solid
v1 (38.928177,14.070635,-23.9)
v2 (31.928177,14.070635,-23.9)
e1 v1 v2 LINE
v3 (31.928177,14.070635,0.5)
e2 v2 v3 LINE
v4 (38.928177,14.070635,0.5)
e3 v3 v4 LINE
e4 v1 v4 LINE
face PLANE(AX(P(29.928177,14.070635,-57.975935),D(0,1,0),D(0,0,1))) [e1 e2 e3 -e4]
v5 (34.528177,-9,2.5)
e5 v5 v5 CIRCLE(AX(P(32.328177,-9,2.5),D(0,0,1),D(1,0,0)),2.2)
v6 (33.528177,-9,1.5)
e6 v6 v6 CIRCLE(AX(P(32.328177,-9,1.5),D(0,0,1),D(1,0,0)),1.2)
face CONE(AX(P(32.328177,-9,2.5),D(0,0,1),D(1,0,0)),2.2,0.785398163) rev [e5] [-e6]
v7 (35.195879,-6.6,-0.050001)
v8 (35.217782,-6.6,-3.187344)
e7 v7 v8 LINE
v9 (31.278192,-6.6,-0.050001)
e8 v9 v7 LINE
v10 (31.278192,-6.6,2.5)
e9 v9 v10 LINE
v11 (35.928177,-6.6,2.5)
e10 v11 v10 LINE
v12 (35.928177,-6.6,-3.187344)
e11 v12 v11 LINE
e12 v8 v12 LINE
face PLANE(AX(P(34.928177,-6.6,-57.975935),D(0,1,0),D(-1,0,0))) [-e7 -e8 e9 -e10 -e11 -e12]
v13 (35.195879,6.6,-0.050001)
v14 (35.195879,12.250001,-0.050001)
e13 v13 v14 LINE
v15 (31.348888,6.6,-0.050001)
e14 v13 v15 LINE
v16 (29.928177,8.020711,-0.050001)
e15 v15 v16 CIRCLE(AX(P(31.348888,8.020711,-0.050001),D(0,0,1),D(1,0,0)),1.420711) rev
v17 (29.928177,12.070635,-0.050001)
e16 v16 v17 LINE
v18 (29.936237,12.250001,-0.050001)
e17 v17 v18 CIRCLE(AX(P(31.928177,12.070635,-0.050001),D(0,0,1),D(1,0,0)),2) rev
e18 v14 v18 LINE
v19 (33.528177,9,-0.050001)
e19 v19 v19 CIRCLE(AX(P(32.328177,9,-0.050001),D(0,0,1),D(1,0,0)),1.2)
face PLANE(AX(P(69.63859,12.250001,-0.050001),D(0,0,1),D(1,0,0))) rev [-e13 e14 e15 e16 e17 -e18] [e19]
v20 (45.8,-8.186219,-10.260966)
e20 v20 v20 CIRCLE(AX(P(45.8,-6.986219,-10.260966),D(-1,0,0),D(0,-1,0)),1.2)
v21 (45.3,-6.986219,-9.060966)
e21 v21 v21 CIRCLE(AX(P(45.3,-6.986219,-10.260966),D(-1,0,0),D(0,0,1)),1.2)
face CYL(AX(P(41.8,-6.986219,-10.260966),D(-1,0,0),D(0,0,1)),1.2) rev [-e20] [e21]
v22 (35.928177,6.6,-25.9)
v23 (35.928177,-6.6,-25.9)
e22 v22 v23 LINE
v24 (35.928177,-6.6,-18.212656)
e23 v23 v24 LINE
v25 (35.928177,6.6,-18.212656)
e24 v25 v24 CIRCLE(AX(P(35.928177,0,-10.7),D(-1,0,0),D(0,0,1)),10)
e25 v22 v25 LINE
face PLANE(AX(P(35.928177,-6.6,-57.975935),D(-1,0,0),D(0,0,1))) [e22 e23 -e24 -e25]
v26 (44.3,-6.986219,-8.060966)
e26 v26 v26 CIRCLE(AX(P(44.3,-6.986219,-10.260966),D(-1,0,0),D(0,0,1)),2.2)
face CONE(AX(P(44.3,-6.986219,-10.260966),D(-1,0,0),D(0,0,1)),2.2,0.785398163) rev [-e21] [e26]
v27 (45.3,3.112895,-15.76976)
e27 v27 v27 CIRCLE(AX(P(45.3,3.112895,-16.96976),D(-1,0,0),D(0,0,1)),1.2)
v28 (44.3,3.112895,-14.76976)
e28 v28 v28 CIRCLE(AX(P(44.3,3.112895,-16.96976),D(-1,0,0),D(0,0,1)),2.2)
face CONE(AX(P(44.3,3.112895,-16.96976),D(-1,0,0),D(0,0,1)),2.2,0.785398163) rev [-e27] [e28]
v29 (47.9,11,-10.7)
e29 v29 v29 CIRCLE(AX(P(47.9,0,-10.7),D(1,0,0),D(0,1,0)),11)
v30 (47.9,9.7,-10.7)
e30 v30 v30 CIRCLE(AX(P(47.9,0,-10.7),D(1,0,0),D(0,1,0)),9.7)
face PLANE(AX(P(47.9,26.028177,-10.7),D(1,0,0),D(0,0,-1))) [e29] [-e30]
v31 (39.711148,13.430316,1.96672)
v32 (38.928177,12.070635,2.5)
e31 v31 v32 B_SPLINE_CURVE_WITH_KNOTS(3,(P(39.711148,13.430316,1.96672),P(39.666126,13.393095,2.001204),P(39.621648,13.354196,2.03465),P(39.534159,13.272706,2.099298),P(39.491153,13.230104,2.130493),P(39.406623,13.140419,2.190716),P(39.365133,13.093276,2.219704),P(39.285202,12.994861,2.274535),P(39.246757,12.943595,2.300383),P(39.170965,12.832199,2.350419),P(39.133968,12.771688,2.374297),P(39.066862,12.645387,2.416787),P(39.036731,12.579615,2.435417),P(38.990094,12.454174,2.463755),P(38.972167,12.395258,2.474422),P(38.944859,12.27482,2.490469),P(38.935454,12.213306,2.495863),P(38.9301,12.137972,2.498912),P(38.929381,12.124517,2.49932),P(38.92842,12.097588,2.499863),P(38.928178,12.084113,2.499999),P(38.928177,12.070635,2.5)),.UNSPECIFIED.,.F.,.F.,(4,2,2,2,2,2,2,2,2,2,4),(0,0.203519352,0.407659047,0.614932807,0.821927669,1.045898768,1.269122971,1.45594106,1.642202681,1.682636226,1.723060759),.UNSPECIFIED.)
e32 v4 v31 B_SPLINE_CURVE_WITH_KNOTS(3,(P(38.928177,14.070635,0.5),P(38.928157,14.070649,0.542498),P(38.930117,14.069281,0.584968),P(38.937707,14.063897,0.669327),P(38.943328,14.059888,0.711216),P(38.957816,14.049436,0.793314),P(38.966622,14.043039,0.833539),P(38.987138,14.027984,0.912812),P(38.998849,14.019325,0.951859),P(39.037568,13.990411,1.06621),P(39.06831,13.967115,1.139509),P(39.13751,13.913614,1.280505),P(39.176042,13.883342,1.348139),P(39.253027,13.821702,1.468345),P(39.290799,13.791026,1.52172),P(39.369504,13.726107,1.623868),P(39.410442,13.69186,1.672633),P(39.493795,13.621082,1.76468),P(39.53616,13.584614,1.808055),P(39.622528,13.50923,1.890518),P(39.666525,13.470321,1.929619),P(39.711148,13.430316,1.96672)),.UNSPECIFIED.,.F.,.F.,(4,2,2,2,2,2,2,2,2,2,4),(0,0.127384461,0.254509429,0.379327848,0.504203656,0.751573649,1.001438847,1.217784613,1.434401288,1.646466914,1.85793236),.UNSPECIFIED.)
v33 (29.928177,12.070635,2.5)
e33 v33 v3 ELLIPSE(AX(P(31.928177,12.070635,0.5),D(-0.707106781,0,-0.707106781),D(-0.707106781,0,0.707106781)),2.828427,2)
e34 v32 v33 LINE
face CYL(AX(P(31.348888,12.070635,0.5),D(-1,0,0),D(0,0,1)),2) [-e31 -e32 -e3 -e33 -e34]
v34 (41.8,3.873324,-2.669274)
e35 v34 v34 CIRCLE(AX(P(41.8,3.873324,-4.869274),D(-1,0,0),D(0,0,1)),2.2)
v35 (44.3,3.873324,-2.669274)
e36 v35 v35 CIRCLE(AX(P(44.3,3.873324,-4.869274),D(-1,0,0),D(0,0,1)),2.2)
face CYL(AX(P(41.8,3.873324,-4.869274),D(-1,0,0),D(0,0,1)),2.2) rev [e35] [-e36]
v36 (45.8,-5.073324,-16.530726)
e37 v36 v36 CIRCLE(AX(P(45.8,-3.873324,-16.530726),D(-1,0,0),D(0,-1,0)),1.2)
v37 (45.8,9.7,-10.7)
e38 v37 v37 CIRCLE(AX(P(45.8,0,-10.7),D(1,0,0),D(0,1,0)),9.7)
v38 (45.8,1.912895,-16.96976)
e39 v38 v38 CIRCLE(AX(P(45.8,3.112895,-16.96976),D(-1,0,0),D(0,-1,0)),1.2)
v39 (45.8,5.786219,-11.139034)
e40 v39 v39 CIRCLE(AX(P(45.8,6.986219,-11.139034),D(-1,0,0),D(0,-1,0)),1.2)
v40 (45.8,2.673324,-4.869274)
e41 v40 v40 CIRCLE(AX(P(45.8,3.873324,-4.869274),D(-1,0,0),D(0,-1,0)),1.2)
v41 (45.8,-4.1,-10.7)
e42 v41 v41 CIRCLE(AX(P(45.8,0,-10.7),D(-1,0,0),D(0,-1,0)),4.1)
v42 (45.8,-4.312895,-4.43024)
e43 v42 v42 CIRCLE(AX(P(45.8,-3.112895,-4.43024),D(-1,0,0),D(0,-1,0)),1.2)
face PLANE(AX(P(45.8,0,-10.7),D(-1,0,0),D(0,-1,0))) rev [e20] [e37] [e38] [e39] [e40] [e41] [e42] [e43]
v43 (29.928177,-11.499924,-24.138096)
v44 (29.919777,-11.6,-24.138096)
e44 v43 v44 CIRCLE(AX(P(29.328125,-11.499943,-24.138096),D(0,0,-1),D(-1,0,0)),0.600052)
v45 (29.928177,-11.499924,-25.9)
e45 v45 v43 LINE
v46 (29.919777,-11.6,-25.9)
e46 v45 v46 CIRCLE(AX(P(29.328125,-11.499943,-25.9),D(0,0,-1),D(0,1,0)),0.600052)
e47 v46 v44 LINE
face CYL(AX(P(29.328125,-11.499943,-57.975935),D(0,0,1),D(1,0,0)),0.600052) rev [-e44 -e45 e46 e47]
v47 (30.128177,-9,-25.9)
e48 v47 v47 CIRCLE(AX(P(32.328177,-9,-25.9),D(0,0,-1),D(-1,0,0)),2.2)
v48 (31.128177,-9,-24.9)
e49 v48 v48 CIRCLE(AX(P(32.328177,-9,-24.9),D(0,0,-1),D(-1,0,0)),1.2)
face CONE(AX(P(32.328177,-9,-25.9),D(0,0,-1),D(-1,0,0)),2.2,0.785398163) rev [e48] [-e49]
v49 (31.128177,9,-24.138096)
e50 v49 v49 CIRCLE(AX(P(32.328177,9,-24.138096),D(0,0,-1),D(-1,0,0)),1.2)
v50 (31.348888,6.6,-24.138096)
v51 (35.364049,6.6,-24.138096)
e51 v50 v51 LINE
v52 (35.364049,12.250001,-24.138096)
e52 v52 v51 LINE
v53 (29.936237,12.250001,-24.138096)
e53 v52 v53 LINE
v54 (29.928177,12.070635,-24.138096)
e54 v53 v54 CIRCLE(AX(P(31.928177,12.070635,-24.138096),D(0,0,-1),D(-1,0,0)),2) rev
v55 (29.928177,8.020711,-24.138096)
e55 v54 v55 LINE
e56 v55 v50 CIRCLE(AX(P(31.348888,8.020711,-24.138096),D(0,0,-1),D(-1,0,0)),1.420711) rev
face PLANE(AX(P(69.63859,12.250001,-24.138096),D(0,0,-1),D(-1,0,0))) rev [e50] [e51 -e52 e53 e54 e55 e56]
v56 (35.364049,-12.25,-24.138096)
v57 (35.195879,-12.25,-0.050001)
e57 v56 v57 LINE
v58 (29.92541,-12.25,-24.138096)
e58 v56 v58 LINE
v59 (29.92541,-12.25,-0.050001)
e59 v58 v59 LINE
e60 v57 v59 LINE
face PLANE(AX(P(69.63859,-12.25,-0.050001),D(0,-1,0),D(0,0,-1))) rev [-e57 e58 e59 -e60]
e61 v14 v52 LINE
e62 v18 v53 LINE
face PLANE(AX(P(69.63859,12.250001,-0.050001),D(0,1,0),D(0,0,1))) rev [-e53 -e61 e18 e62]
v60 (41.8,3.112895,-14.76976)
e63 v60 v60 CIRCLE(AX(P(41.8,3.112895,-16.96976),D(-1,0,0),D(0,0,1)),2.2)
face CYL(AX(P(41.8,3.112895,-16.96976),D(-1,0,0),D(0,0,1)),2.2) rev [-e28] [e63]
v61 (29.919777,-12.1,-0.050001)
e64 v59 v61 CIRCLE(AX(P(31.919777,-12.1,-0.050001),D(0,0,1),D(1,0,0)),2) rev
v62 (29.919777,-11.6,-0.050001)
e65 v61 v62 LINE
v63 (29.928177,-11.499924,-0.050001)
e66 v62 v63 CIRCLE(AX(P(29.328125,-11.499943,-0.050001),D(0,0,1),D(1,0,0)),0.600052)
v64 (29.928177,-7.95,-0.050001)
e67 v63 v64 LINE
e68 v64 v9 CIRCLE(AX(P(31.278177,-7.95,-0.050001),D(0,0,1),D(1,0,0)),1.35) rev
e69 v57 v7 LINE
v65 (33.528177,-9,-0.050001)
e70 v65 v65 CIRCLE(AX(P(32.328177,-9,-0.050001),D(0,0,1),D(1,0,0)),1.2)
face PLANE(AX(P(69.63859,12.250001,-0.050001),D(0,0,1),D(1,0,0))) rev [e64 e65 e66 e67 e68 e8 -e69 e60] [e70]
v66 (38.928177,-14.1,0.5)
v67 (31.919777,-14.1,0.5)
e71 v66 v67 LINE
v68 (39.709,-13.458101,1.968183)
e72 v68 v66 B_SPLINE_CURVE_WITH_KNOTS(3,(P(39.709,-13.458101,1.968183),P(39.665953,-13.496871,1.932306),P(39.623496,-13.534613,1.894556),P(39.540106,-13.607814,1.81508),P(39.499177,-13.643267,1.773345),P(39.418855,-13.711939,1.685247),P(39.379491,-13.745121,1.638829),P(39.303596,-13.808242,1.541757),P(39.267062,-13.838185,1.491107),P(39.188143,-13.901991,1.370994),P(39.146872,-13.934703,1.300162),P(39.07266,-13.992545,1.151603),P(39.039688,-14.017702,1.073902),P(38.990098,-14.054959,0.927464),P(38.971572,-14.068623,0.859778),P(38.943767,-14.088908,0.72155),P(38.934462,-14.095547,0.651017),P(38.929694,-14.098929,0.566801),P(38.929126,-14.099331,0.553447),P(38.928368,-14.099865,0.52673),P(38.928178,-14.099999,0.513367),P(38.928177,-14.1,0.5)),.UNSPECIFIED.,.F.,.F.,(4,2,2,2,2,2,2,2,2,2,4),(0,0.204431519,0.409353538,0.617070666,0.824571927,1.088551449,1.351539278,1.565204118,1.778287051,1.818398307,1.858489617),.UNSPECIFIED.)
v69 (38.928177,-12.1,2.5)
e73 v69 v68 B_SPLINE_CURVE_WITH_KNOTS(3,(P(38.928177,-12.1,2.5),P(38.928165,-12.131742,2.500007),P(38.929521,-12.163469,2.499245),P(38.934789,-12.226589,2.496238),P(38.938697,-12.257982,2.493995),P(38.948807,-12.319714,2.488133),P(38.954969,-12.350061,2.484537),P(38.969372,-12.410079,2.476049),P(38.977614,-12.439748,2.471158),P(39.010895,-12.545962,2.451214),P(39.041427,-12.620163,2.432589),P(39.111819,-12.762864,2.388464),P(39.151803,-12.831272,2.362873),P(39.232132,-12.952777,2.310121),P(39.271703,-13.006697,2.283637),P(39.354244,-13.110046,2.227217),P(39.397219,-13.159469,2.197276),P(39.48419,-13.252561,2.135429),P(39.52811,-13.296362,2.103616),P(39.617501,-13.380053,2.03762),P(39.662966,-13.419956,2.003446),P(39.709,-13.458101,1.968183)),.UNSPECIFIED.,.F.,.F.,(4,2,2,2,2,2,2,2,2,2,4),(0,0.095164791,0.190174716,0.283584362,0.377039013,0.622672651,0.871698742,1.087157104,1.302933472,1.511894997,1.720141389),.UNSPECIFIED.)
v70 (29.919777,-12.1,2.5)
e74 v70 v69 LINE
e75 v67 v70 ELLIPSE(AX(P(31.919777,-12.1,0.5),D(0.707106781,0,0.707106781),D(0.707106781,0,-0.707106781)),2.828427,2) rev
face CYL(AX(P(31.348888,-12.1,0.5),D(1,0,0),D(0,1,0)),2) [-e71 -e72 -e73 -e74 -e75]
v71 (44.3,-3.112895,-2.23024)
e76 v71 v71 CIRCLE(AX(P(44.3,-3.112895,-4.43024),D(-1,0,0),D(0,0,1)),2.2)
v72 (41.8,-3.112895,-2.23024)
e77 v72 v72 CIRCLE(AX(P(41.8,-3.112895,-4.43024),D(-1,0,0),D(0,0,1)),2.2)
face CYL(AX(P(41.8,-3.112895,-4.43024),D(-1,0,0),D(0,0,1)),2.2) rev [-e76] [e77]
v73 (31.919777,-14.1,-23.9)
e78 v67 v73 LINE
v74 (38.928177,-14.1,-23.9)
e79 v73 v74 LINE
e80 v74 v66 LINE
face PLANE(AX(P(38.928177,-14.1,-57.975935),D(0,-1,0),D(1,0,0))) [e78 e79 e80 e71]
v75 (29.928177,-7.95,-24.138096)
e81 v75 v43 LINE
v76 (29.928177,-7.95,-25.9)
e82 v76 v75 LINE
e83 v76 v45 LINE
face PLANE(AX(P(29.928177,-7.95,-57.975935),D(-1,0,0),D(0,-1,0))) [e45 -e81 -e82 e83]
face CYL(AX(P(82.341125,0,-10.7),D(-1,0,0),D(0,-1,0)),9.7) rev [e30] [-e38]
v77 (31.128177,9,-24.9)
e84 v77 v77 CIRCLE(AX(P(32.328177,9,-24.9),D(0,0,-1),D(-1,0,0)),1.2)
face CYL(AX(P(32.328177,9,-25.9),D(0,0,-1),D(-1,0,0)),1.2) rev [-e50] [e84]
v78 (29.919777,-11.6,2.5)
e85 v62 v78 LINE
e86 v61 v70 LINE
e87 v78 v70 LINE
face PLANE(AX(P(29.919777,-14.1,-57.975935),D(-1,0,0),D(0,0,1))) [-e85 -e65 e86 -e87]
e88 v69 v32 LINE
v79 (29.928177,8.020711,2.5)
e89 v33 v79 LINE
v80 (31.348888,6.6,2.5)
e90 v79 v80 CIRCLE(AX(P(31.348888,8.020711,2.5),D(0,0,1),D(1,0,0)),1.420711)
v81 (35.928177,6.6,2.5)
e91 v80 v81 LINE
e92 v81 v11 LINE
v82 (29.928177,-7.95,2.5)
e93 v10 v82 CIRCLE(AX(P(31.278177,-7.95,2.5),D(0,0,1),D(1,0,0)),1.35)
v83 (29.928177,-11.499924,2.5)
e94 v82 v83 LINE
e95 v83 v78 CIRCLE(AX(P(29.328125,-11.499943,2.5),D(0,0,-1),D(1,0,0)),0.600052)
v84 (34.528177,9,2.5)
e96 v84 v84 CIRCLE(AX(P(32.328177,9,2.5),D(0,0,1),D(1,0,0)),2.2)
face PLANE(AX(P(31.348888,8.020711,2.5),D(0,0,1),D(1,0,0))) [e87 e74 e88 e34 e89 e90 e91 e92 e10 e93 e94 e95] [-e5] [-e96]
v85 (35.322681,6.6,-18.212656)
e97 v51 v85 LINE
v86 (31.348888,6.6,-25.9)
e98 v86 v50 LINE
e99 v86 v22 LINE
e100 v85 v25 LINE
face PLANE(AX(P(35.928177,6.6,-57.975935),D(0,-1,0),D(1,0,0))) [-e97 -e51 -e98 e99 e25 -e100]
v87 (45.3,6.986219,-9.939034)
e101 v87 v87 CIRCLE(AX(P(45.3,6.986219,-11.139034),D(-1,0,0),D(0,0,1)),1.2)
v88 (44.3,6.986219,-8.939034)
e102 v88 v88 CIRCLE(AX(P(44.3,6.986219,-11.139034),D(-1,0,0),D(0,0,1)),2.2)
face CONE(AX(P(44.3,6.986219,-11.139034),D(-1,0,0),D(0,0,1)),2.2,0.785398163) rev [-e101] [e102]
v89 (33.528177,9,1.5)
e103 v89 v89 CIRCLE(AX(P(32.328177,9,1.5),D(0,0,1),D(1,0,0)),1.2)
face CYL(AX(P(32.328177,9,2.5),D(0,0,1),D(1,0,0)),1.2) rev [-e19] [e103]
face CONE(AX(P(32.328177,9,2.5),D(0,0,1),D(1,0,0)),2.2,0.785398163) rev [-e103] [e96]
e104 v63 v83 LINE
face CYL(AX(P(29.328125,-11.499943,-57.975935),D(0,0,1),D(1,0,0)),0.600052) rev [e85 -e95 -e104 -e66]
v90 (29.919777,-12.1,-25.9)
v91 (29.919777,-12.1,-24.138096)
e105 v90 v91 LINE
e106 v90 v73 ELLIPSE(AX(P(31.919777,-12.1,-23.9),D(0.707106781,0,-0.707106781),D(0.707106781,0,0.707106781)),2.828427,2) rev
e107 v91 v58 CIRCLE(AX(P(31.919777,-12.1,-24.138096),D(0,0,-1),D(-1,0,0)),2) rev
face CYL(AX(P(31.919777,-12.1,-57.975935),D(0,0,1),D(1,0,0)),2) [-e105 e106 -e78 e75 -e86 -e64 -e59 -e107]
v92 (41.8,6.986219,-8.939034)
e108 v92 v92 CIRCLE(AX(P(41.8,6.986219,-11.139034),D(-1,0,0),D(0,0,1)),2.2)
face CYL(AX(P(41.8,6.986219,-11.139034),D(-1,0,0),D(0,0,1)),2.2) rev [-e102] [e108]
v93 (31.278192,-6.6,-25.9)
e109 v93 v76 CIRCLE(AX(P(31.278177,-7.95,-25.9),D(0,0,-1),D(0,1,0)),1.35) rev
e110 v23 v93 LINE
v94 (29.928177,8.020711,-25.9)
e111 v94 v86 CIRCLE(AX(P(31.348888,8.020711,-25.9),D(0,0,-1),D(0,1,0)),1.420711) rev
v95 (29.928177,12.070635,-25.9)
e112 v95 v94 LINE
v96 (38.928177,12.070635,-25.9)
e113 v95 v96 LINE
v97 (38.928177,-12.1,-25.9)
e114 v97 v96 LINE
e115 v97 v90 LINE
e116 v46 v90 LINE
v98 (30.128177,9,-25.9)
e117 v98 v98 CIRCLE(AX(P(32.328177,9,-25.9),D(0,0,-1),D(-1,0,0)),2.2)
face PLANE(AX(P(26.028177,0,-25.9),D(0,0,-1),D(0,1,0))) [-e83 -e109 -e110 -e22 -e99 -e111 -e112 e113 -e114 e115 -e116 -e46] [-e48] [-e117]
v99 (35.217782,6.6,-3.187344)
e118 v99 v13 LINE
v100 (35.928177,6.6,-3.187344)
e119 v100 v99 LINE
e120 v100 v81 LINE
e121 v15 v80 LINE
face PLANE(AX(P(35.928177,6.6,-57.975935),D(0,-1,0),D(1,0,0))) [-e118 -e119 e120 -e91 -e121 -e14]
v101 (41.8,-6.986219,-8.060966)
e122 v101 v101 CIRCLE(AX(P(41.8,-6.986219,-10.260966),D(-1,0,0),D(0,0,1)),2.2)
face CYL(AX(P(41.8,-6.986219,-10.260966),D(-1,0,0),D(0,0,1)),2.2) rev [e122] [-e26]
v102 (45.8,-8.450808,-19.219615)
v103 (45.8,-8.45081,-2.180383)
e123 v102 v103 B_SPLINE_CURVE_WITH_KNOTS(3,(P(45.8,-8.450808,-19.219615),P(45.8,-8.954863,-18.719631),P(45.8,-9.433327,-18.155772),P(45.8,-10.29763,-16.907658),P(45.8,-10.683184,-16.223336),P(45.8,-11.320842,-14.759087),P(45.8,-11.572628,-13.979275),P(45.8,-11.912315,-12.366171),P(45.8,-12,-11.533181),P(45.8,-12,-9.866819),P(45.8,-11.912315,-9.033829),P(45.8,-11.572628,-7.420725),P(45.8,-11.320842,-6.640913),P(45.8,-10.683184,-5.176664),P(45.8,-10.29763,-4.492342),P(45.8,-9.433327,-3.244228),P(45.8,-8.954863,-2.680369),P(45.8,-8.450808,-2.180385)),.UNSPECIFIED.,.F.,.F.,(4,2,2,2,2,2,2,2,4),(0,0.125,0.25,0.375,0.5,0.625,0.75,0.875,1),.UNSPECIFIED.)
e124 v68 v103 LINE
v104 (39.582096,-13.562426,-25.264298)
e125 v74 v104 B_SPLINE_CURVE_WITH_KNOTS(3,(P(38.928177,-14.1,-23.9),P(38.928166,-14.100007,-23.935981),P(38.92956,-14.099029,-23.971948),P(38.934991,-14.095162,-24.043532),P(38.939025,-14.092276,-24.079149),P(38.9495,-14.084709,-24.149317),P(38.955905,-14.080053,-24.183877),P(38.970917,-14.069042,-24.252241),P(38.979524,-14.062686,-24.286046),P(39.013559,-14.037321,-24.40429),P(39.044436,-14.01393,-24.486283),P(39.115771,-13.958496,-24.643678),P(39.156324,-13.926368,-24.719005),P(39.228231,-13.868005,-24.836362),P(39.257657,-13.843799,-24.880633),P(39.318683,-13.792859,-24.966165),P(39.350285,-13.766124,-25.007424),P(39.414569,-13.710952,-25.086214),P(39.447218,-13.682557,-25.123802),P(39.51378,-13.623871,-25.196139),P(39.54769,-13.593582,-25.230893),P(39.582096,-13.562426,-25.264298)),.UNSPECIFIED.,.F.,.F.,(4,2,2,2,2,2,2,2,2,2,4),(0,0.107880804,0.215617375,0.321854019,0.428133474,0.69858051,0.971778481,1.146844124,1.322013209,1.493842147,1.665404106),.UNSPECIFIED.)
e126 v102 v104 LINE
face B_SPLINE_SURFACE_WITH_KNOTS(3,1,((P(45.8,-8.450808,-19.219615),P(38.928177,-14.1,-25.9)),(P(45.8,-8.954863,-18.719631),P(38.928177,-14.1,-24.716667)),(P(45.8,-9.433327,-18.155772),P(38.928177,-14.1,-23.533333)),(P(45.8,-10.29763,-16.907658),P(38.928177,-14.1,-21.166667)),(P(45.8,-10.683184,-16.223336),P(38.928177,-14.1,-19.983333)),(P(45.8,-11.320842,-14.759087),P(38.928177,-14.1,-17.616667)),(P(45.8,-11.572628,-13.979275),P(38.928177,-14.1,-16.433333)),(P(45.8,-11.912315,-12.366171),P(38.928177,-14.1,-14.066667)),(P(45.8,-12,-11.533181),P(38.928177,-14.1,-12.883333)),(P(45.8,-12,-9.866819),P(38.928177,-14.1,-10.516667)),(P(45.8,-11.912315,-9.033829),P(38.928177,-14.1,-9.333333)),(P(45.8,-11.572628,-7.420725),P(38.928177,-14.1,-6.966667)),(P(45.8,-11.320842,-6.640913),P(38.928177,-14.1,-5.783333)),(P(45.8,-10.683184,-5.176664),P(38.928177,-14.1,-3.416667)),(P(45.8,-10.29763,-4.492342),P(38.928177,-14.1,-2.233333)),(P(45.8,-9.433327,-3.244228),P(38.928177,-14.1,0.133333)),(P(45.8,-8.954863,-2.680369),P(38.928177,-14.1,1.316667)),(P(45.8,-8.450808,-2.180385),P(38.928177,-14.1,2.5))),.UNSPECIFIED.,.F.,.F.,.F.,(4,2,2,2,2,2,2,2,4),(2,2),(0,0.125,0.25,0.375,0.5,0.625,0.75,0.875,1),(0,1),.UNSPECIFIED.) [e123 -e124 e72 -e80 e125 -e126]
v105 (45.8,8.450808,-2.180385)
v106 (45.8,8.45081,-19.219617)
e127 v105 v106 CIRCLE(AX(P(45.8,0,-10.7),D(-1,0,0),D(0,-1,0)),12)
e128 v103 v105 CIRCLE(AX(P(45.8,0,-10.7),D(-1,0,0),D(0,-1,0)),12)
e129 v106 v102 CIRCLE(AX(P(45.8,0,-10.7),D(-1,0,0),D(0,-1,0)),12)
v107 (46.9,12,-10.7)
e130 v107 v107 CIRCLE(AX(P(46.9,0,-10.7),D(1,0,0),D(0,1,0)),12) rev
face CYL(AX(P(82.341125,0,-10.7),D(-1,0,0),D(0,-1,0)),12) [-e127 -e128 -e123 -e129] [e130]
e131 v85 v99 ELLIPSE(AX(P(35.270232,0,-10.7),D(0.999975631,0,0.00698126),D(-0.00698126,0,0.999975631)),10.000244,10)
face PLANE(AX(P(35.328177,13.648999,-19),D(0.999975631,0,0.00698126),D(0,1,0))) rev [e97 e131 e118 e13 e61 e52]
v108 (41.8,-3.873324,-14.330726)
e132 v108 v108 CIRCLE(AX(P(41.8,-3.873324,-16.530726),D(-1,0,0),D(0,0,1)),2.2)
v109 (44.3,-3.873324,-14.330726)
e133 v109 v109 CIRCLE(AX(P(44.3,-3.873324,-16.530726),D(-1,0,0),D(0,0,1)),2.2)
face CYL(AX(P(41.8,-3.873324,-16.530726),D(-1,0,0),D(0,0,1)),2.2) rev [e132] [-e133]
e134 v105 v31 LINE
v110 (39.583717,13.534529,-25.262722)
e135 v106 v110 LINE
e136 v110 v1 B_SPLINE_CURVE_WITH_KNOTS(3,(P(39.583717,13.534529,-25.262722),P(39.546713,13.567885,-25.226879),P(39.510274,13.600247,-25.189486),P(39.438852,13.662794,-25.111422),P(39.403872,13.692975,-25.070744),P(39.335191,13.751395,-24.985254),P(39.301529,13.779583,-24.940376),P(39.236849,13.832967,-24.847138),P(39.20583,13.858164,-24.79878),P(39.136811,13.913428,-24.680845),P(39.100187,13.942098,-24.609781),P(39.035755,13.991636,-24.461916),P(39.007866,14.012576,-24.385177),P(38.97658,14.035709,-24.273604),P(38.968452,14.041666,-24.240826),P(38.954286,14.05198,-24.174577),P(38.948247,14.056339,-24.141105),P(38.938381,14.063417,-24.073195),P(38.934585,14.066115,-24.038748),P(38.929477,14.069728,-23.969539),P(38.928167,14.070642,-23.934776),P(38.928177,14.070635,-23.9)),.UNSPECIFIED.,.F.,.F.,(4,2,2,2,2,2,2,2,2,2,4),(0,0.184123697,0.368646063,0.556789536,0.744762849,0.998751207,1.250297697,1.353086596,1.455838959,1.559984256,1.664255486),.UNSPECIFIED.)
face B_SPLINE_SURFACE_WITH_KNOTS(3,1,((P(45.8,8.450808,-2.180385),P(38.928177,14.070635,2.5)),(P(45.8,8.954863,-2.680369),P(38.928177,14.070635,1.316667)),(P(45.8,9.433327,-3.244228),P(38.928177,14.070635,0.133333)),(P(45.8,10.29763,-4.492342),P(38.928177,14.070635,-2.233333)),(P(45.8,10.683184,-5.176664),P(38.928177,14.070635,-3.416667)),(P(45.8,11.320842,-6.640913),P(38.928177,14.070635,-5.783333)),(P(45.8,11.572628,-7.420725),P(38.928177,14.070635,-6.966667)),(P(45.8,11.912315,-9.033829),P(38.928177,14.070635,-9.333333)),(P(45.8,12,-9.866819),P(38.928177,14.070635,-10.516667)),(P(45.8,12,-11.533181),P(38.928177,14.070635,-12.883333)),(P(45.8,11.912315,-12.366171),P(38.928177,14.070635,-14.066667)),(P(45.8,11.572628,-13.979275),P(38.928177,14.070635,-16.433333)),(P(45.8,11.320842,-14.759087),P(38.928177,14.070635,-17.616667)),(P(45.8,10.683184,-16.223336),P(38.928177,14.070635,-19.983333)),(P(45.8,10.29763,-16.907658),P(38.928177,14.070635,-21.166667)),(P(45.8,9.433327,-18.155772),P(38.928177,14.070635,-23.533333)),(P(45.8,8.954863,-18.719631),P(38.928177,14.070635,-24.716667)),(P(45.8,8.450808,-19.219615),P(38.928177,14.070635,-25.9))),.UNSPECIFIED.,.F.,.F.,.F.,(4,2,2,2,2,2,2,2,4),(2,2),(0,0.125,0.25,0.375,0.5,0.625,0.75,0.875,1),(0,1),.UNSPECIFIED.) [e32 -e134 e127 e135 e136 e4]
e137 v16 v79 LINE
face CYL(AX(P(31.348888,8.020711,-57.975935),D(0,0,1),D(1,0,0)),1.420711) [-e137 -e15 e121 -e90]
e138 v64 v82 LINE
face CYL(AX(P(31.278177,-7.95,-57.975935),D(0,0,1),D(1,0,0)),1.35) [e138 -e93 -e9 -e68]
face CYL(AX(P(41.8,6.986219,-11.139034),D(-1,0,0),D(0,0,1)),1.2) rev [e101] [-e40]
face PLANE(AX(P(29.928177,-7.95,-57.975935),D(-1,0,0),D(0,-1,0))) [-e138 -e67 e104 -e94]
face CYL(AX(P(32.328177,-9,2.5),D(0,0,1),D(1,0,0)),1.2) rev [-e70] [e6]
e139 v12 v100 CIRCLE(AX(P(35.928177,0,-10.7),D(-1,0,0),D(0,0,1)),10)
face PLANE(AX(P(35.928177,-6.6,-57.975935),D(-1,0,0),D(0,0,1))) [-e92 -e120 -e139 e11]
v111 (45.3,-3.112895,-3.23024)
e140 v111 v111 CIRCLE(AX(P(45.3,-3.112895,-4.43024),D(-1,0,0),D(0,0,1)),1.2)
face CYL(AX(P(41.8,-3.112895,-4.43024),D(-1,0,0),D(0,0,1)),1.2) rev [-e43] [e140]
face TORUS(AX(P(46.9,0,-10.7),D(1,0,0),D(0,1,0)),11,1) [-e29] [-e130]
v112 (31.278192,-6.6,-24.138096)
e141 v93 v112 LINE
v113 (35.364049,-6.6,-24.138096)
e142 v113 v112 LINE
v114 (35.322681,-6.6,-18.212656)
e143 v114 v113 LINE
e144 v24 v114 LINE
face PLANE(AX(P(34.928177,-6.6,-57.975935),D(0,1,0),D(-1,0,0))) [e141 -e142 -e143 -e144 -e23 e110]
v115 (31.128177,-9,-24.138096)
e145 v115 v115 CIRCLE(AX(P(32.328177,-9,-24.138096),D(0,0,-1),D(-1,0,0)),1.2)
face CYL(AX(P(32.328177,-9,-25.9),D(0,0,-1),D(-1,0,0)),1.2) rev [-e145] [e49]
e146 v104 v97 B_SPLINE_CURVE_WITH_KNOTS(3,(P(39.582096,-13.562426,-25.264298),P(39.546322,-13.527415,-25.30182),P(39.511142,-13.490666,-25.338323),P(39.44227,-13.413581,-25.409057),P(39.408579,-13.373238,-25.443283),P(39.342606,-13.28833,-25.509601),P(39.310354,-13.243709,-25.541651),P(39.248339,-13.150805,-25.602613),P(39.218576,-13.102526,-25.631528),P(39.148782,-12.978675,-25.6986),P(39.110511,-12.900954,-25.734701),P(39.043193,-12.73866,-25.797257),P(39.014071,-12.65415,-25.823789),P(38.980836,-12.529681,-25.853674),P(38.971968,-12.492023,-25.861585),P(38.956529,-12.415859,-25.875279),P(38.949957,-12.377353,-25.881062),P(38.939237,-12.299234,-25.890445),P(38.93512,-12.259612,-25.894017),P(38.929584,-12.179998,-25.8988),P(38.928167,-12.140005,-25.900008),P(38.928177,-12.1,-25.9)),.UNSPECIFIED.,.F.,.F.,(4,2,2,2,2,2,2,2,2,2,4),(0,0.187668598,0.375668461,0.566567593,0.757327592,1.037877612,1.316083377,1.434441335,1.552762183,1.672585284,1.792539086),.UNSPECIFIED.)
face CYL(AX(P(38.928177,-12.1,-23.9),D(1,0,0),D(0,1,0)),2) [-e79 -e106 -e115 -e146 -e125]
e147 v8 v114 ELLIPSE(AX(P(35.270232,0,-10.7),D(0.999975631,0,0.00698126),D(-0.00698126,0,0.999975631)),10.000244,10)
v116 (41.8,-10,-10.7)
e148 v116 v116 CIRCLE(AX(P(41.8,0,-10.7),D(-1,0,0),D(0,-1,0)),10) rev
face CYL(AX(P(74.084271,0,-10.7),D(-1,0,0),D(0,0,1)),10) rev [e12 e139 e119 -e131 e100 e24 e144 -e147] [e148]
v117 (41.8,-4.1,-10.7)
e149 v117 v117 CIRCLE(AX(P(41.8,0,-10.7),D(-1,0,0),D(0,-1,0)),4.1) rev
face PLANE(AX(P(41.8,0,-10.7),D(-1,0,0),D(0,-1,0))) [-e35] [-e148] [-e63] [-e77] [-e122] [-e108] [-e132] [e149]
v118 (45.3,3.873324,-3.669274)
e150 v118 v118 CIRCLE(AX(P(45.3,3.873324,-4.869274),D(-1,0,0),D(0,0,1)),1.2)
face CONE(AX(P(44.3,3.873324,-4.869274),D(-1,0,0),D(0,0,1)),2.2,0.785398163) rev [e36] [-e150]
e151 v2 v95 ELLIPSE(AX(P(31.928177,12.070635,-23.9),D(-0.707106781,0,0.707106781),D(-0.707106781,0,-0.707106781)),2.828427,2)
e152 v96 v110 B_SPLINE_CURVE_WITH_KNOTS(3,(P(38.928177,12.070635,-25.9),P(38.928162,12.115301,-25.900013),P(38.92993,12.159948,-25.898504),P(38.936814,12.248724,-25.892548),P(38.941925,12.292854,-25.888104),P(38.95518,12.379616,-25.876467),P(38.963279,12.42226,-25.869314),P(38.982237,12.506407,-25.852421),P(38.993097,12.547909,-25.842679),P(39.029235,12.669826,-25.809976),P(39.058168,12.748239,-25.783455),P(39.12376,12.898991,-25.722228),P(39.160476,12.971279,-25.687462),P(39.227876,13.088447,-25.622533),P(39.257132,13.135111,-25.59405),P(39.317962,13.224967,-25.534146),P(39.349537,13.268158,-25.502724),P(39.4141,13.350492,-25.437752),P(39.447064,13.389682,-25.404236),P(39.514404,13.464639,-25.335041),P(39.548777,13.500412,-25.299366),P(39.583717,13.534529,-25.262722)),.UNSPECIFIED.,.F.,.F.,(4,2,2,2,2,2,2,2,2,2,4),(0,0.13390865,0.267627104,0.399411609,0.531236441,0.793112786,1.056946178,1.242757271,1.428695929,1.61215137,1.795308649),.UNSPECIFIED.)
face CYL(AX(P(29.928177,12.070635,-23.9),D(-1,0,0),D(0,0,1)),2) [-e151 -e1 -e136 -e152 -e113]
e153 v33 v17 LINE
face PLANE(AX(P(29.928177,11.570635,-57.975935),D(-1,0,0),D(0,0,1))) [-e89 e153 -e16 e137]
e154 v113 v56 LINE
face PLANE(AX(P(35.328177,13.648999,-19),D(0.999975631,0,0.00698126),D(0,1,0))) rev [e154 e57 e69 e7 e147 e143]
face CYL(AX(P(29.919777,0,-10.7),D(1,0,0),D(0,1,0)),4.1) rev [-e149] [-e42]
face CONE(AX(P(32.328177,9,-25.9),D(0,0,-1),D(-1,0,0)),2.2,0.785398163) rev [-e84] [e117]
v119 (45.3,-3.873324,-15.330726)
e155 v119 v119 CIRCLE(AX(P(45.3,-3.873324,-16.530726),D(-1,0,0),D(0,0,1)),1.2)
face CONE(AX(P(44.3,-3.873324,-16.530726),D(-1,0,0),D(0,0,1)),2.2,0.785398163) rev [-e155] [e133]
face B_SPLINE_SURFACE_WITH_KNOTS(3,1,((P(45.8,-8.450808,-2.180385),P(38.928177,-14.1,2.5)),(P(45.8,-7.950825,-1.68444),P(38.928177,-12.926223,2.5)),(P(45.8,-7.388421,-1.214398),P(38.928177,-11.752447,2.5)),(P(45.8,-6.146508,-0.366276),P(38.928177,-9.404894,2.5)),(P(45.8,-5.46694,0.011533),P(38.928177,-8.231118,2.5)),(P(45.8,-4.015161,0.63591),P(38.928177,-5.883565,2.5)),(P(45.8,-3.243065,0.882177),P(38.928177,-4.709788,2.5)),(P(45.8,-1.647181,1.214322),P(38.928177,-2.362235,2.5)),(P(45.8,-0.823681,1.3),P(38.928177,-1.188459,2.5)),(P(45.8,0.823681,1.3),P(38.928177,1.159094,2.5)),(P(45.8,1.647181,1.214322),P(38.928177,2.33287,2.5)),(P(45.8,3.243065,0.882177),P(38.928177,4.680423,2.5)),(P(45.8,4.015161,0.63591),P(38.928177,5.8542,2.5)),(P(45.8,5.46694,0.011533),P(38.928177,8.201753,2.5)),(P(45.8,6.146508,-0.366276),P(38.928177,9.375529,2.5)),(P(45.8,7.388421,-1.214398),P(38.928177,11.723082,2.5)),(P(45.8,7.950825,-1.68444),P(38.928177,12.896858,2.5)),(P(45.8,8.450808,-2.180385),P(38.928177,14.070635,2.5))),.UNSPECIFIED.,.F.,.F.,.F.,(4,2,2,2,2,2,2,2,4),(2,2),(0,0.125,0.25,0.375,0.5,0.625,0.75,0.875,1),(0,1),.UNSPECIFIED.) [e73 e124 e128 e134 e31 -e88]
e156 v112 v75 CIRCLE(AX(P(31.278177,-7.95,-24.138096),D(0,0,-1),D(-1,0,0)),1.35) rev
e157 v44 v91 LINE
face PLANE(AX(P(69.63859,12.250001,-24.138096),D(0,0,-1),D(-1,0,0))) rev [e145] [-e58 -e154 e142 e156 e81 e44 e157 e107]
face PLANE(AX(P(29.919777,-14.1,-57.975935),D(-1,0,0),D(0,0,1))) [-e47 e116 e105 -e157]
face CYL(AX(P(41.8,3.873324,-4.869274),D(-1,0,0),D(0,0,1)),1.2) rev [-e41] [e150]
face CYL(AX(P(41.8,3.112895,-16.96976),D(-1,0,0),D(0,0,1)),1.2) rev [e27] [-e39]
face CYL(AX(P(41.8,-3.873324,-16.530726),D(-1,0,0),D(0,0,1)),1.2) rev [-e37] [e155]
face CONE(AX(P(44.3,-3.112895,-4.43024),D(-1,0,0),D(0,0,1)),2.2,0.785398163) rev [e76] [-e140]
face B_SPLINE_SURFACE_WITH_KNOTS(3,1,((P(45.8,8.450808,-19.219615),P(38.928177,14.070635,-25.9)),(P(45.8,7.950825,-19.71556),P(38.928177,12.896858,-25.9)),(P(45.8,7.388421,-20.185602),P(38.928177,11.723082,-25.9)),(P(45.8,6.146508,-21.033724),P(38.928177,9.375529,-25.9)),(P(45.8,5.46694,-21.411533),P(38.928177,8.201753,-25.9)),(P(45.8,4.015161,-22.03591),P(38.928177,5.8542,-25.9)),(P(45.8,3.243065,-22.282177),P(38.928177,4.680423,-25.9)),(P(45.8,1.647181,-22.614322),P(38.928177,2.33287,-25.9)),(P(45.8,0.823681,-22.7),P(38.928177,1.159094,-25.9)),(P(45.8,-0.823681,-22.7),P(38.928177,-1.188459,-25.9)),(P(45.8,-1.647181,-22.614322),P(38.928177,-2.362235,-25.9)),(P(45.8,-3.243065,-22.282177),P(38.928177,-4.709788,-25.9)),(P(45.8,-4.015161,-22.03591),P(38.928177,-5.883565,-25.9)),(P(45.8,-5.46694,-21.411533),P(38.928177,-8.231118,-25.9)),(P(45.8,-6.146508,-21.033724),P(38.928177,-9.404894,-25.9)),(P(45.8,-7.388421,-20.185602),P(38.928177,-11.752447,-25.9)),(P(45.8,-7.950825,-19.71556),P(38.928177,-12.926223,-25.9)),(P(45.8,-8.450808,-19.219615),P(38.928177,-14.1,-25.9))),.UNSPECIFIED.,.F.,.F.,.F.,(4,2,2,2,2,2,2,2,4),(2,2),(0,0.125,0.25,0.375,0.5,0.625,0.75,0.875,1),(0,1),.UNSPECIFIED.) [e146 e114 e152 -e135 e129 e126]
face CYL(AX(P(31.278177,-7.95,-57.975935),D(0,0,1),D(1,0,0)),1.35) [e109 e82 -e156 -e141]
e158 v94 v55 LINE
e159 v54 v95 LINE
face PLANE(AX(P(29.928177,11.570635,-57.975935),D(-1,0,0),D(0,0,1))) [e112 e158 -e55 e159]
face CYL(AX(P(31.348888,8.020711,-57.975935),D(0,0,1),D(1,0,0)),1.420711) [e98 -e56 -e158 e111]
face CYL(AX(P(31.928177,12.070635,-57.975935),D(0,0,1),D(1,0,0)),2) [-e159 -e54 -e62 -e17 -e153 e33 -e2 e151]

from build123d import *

# Parameters (mm, degrees)
BOSS_EXTRUDE1_DEPTH                                  = 2.5
BOSS_EXTRUDE1_DEPTH_BACK                             = 25.9
CUT_EXTRUDE1_START                                   = -12.2500003
CUT_EXTRUDE1_DEPTH                                   = 24.500001543
CUT_EXTRUDE2_DEPTH                                   = 34.493305247
CUT_EXTRUDE2_DEPTH_BACK                              = 34.493305247
SKETCH6_R                                            = 11.999999661
SKETCH6_R_2                                          = 9.7
BOSS_EXTRUDE2_DEPTH                                  = 2.1
CSK_FOR_M2_COUNTERSUNK_RAISED_HEAD_SCREW_D           = 2.4
CSK_FOR_M2_COUNTERSUNK_RAISED_HEAD_SCREW_DEPTH       = 4
CSK_FOR_M2_COUNTERSUNK_RAISED_HEAD_SCREW_CSINK_D     = 4.4
CSK_FOR_M2_COUNTERSUNK_RAISED_HEAD_SCREW_CSINK_ANGLE = 90
CSK_FOR_M2_COUNTERSUNK_RAISED_HEAD_SCREW_TIP         = 0.721032743
CSK_FOR_M2_COUNTERSUNK_RAISED_HEAD_S_2_D             = 2.4
CSK_FOR_M2_COUNTERSUNK_RAISED_HEAD_S_2_DEPTH         = 4
CSK_FOR_M2_COUNTERSUNK_RAISED_HEAD_S_2_CSINK_D       = 4.4
CSK_FOR_M2_COUNTERSUNK_RAISED_HEAD_S_2_CSINK_ANGLE   = 90
CSK_FOR_M2_COUNTERSUNK_RAISED_HEAD_S_2_TIP           = 0.721032743
CUT_EXTRUDE3_DEPTH                                   = 32.82678972
CUT_EXTRUDE3_DEPTH_BACK                              = 5.871823
SKETCH13_R                                           = 10
CSK_FOR_M2_COUNTERSUNK_RAISED_HEAD_S_3_A_COUNT       = 2
CSK_FOR_M2_COUNTERSUNK_RAISED_HEAD_S_3_A_PITCH       = 7
CSK_FOR_M2_COUNTERSUNK_RAISED_HEAD_S_4_COUNT         = 2
CSK_FOR_M2_COUNTERSUNK_RAISED_HEAD_S_4_PITCH         = 12.124355653
CSK_FOR_M2_COUNTERSUNK_RAISED_HEAD_S_5_COUNT         = 2
CSK_FOR_M2_COUNTERSUNK_RAISED_HEAD_S_5_PITCH         = 14
CSK_FOR_M2_COUNTERSUNK_RAISED_HEAD_S_6_COUNT         = 2
CSK_FOR_M2_COUNTERSUNK_RAISED_HEAD_S_6_PITCH         = 12.124355653
CSK_FOR_M2_COUNTERSUNK_RAISED_HEAD_S_7_COUNT         = 2
CSK_FOR_M2_COUNTERSUNK_RAISED_HEAD_S_7_PITCH         = 7
FILLET1_R                                            = 2
FILLET2_R                                            = 1


with BuildPart() as part:
    # Sketch1 → Boss-Extrude1 (new, two sides: drawn at the far end of the back side and taken through both)
    with BuildSketch(Plane.XY.offset(-BOSS_EXTRUDE1_DEPTH_BACK)):
        with BuildLine():
            Line((29.928177417, 11.570634763), (29.928177417, 14.070634763))
            Line((29.928177417, 14.070634763), (38.928177148, 14.070634763))
            Line((38.928177148, 14.070634763), (38.928177148, -14.099999768))
            Line((38.928177148, -14.099999768), (29.91977661, -14.099999768))
            Line((29.91977661, -14.099999768), (29.91977661, -11.599999768))
            ThreePointArc((29.91977661, -11.599999768), (29.926074346, -11.550137868), (29.928177417, -11.499923848))
            Line((29.928177417, -11.499923848), (29.928177417, -7.95))
            ThreePointArc((29.928177417, -7.95), (30.323588466, -6.995400641), (31.278192136, -6.6))
            Line((31.278192136, -6.6), (34.928177148, -6.6))
            Line((34.928177148, -6.6), (35.928177148, -6.6))
            Line((35.928177148, -6.6), (35.928177148, 6.6))
            Line((35.928177148, 6.6), (35.087455795, 6.6))
            Line((35.087455795, 6.6), (31.348888095, 6.6))
            ThreePointArc((31.348888095, 6.6), (30.34429394, 7.016116524), (29.928177417, 8.020710678))
            Line((29.928177417, 8.020710678), (29.928177417, 11.570634763))
        make_face()
    extrude(amount=BOSS_EXTRUDE1_DEPTH + BOSS_EXTRUDE1_DEPTH_BACK)

    # Cut-Extrude1: read off the stored shape, not the designer's step
    # Cut-Extrude1 outline → Cut-Extrude1 (cut)
    with BuildSketch(Plane(origin=(0, 0, 0), x_dir=(1, 0, 0), z_dir=(0, 1, 0)).offset(CUT_EXTRUDE1_START)):
        Polygon((35.195879318, 0.050001172), (35.36404868, 24.138096471), (29.91977661, 24.138096471), (29.91977661, 0.050001172), align=None)
    extrude(amount=CUT_EXTRUDE1_DEPTH, mode=Mode.SUBTRACT)

    # Loft1: read off the stored shape, not the designer's step
    # Loft1: loft between two sections, ruled curve by curve
    loft1_from = [
        Edge.make_bspline([(45.8, -8.450808127, -2.180385345), (45.8, -7.95082458, -1.684439789), (45.8, -7.388421064, -1.214398248), (45.8, -6.146508219, -0.366276416), (45.8, -5.466939506, 0.01153308), (45.8, -4.015161183, 0.635909719), (45.8, -3.243064682, 0.882176609), (45.8, -1.647180674, 1.214322446), (45.8, -0.823680968, 1.299999661), (45.8, 0.823680968, 1.299999661), (45.8, 1.647180674, 1.214322446), (45.8, 3.243064682, 0.882176609), (45.8, 4.015161183, 0.635909719), (45.8, 5.466939506, 0.01153308), (45.8, 6.146508219, -0.366276416), (45.8, 7.388421064, -1.214398248), (45.8, 7.95082458, -1.684439789), (45.8, 8.450808127, -2.180385345)], [0, 0, 0, 0, 0.125, 0.125, 0.25, 0.25, 0.375, 0.375, 0.5, 0.5, 0.625, 0.625, 0.75, 0.75, 0.875, 0.875, 1, 1, 1, 1], 3),
        Edge.make_bspline([(45.8, 8.450808127, -2.180385345), (45.8, 8.954862543, -2.680368892), (45.8, 9.433327263, -3.244228398), (45.8, 10.297629636, -4.492342043), (45.8, 10.683183568, -5.176664124), (45.8, 11.320842078, -6.64091328), (45.8, 11.572628128, -7.420725214), (45.8, 11.912314661, -9.03382944), (45.8, 11.999999661, -9.866818787), (45.8, 11.999999661, -11.533181213), (45.8, 11.912314661, -12.36617056), (45.8, 11.572628128, -13.979274786), (45.8, 11.320842078, -14.75908672), (45.8, 10.683183568, -16.223335876), (45.8, 10.297629636, -16.907657957), (45.8, 9.433327263, -18.155771602), (45.8, 8.954862543, -18.719631108), (45.8, 8.450808127, -19.219614655)], [0, 0, 0, 0, 0.125, 0.125, 0.25, 0.25, 0.375, 0.375, 0.5, 0.5, 0.625, 0.625, 0.75, 0.75, 0.875, 0.875, 1, 1, 1, 1], 3),
        Edge.make_bspline([(45.8, -8.450808127, -19.219614655), (45.8, -8.954862543, -18.719631108), (45.8, -9.433327263, -18.155771602), (45.8, -10.297629636, -16.907657957), (45.8, -10.683183568, -16.223335876), (45.8, -11.320842078, -14.75908672), (45.8, -11.572628128, -13.979274786), (45.8, -11.912314661, -12.36617056), (45.8, -11.999999661, -11.533181213), (45.8, -11.999999661, -9.866818787), (45.8, -11.912314661, -9.03382944), (45.8, -11.572628128, -7.420725214), (45.8, -11.320842078, -6.64091328), (45.8, -10.683183568, -5.176664124), (45.8, -10.297629636, -4.492342043), (45.8, -9.433327263, -3.244228398), (45.8, -8.954862543, -2.680368892), (45.8, -8.450808127, -2.180385345)], [0, 0, 0, 0, 0.125, 0.125, 0.25, 0.25, 0.375, 0.375, 0.5, 0.5, 0.625, 0.625, 0.75, 0.75, 0.875, 0.875, 1, 1, 1, 1], 3),
        Edge.make_bspline([(45.8, 8.450808127, -19.219614655), (45.8, 7.95082458, -19.715560211), (45.8, 7.388421064, -20.185601752), (45.8, 6.146508219, -21.033723584), (45.8, 5.466939506, -21.41153308), (45.8, 4.015161183, -22.035909719), (45.8, 3.243064682, -22.282176609), (45.8, 1.647180674, -22.614322446), (45.8, 0.823680968, -22.699999661), (45.8, -0.823680968, -22.699999661), (45.8, -1.647180674, -22.614322446), (45.8, -3.243064682, -22.282176609), (45.8, -4.015161183, -22.035909719), (45.8, -5.466939506, -21.41153308), (45.8, -6.146508219, -21.033723584), (45.8, -7.388421064, -20.185601752), (45.8, -7.95082458, -19.715560211), (45.8, -8.450808127, -19.219614655)], [0, 0, 0, 0, 0.125, 0.125, 0.25, 0.25, 0.375, 0.375, 0.5, 0.5, 0.625, 0.625, 0.75, 0.75, 0.875, 0.875, 1, 1, 1, 1], 3),
    ]
    loft1_to = [
        Edge.make_bspline([(38.928177148, -14.099999768, 2.5), (38.928177148, -12.92622333, 2.5), (38.928177148, -11.752446891, 2.5), (38.928177148, -9.404894013, 2.5), (38.928177148, -8.231117574, 2.5), (38.928177148, -5.883564697, 2.5), (38.928177148, -4.709788258, 2.5), (38.928177148, -2.36223538, 2.5), (38.928177148, -1.188458942, 2.5), (38.928177148, 1.159093936, 2.5), (38.928177148, 2.332870375, 2.5), (38.928177148, 4.680423252, 2.5), (38.928177148, 5.854199691, 2.5), (38.928177148, 8.201752569, 2.5), (38.928177148, 9.375529008, 2.5), (38.928177148, 11.723081885, 2.5), (38.928177148, 12.896858324, 2.5), (38.928177148, 14.070634763, 2.5)], [0, 0, 0, 0, 0.125, 0.125, 0.25, 0.25, 0.375, 0.375, 0.5, 0.5, 0.625, 0.625, 0.75, 0.75, 0.875, 0.875, 1, 1, 1, 1], 3),
        Edge.make_bspline([(38.928177148, 14.070634763, 2.5), (38.928177148, 14.070634763, 1.316666667), (38.928177148, 14.070634763, 0.133333333), (38.928177148, 14.070634763, -2.233333333), (38.928177148, 14.070634763, -3.416666667), (38.928177148, 14.070634763, -5.783333333), (38.928177148, 14.070634763, -6.966666667), (38.928177148, 14.070634763, -9.333333333), (38.928177148, 14.070634763, -10.516666667), (38.928177148, 14.070634763, -12.883333333), (38.928177148, 14.070634763, -14.066666667), (38.928177148, 14.070634763, -16.433333333), (38.928177148, 14.070634763, -17.616666667), (38.928177148, 14.070634763, -19.983333333), (38.928177148, 14.070634763, -21.166666667), (38.928177148, 14.070634763, -23.533333333), (38.928177148, 14.070634763, -24.716666667), (38.928177148, 14.070634763, -25.9)], [0, 0, 0, 0, 0.125, 0.125, 0.25, 0.25, 0.375, 0.375, 0.5, 0.5, 0.625, 0.625, 0.75, 0.75, 0.875, 0.875, 1, 1, 1, 1], 3),
        Edge.make_bspline([(38.928177148, -14.099999768, -25.9), (38.928177148, -14.099999768, -24.716666667), (38.928177148, -14.099999768, -23.533333333), (38.928177148, -14.099999768, -21.166666667), (38.928177148, -14.099999768, -19.983333333), (38.928177148, -14.099999768, -17.616666667), (38.928177148, -14.099999768, -16.433333333), (38.928177148, -14.099999768, -14.066666667), (38.928177148, -14.099999768, -12.883333333), (38.928177148, -14.099999768, -10.516666667), (38.928177148, -14.099999768, -9.333333333), (38.928177148, -14.099999768, -6.966666667), (38.928177148, -14.099999768, -5.783333333), (38.928177148, -14.099999768, -3.416666667), (38.928177148, -14.099999768, -2.233333333), (38.928177148, -14.099999768, 0.133333333), (38.928177148, -14.099999768, 1.316666667), (38.928177148, -14.099999768, 2.5)], [0, 0, 0, 0, 0.125, 0.125, 0.25, 0.25, 0.375, 0.375, 0.5, 0.5, 0.625, 0.625, 0.75, 0.75, 0.875, 0.875, 1, 1, 1, 1], 3),
        Edge.make_bspline([(38.928177148, 14.070634763, -25.9), (38.928177148, 12.896858324, -25.9), (38.928177148, 11.723081885, -25.9), (38.928177148, 9.375529008, -25.9), (38.928177148, 8.201752569, -25.9), (38.928177148, 5.854199691, -25.9), (38.928177148, 4.680423252, -25.9), (38.928177148, 2.332870375, -25.9), (38.928177148, 1.159093936, -25.9), (38.928177148, -1.188458942, -25.9), (38.928177148, -2.36223538, -25.9), (38.928177148, -4.709788258, -25.9), (38.928177148, -5.883564697, -25.9), (38.928177148, -8.231117574, -25.9), (38.928177148, -9.404894013, -25.9), (38.928177148, -11.752446891, -25.9), (38.928177148, -12.92622333, -25.9), (38.928177148, -14.099999768, -25.9)], [0, 0, 0, 0, 0.125, 0.125, 0.25, 0.25, 0.375, 0.375, 0.5, 0.5, 0.625, 0.625, 0.75, 0.75, 0.875, 0.875, 1, 1, 1, 1], 3),
    ]
    loft1 = Solid(Shell([*[Face.make_surface_from_curves(loft1_from[k], loft1_to[k]) for k in range(4)], Face(Wire(loft1_from)), Face(Wire(loft1_to))]))
    add(loft1)

    # Sketch5 → Cut-Extrude2 (cut, two sides: drawn at the far end of the back side and taken through both)
    with BuildSketch(Plane(origin=(45.8, 0, 0), x_dir=(0, 0, -1), z_dir=(1, 0, 0)).offset(-CUT_EXTRUDE2_DEPTH_BACK)):
        with BuildLine():
            ThreePointArc((14.791927995, -0.257148361), (10.957148361, 4.091927995), (6.608072005, 0.257148361))
            ThreePointArc((6.608072005, 0.257148361), (10.442851639, -4.091927995), (14.791927995, -0.257148361))
        make_face()
    extrude(amount=CUT_EXTRUDE2_DEPTH + CUT_EXTRUDE2_DEPTH_BACK, mode=Mode.SUBTRACT)

    # Sketch6 → Boss-Extrude2 (add)
    with BuildSketch(Plane(origin=(45.8, 0, 0), x_dir=(0, 0, -1), z_dir=(1, 0, 0))):
        with Locations(Location((10.7, 0, 0), (0, 0, 224.767695716))):
            Circle(SKETCH6_R)
        with Locations(Location((10.7, 0, 0), (0, 0, 90))):
            Circle(SKETCH6_R_2, mode=Mode.SUBTRACT)
    extrude(amount=BOSS_EXTRUDE2_DEPTH)

    # CSK for M2 Countersunk Raised Head Screw
    with Locations(Plane.XY.offset(2.5)):
        with Locations((32.328177417, 9), (32.328177417, -9)):
            CounterSinkHole(CSK_FOR_M2_COUNTERSUNK_RAISED_HEAD_SCREW_D / 2, CSK_FOR_M2_COUNTERSUNK_RAISED_HEAD_SCREW_CSINK_D / 2, depth=CSK_FOR_M2_COUNTERSUNK_RAISED_HEAD_SCREW_DEPTH, counter_sink_angle=CSK_FOR_M2_COUNTERSUNK_RAISED_HEAD_SCREW_CSINK_ANGLE)
            with Locations((0, 0, -(CSK_FOR_M2_COUNTERSUNK_RAISED_HEAD_SCREW_DEPTH + CSK_FOR_M2_COUNTERSUNK_RAISED_HEAD_SCREW_TIP / 2))):  # 118° drill point
                Cone(0, CSK_FOR_M2_COUNTERSUNK_RAISED_HEAD_SCREW_D / 2, CSK_FOR_M2_COUNTERSUNK_RAISED_HEAD_SCREW_TIP, mode=Mode.SUBTRACT)

    # CSK for M2 Countersunk Raised Head S 2
    with Locations(Plane(origin=(0, 0, -25.9), x_dir=(-1, 0, 0), z_dir=(0, 0, -1))):
        with Locations((-32.328177417, -9), (-32.328177417, 9)):
            CounterSinkHole(CSK_FOR_M2_COUNTERSUNK_RAISED_HEAD_S_2_D / 2, CSK_FOR_M2_COUNTERSUNK_RAISED_HEAD_S_2_CSINK_D / 2, depth=CSK_FOR_M2_COUNTERSUNK_RAISED_HEAD_S_2_DEPTH, counter_sink_angle=CSK_FOR_M2_COUNTERSUNK_RAISED_HEAD_S_2_CSINK_ANGLE)
            with Locations((0, 0, -(CSK_FOR_M2_COUNTERSUNK_RAISED_HEAD_S_2_DEPTH + CSK_FOR_M2_COUNTERSUNK_RAISED_HEAD_S_2_TIP / 2))):  # 118° drill point
                Cone(0, CSK_FOR_M2_COUNTERSUNK_RAISED_HEAD_S_2_D / 2, CSK_FOR_M2_COUNTERSUNK_RAISED_HEAD_S_2_TIP, mode=Mode.SUBTRACT)

    # Sketch13 → Cut-Extrude3 (cut, two sides: drawn at the far end of the back side and taken through both)
    with BuildSketch(Plane.ZY.offset(-35.928177148).offset(-CUT_EXTRUDE3_DEPTH_BACK)):
        with Locations(Location((-10.7, 0, 0), (0, 0, 318.70012721))):
            Circle(SKETCH13_R)
    extrude(amount=CUT_EXTRUDE3_DEPTH + CUT_EXTRUDE3_DEPTH_BACK, mode=Mode.SUBTRACT)

    # Sketch17 → CSK for M2 Countersunk Raised Head S 3 (revolve, cut)
    with BuildSketch(Plane(origin=(41.8, 3.112894851, -16.969759616), x_dir=(0, 0, 1), z_dir=(0, 1, 0))):
        Polygon((0, 0), (0, 6.1), (1.2, 6.1), (1.2, 3.5), (2.2, 2.5), (2.2, 0), align=None)
    csk_for_m2_countersunk_raised_head_s_3 = revolve(axis=Axis((35.45, 3.112894851, -16.969759616), (1, 0, 0)), mode=Mode.SUBTRACT)

    # CSK for M2 Countersunk Raised Head S 3 a: CSK for M2 Countersunk Raised Head S 3 ×2
    with Locations(*[Vector(0, 0.553331953965189, 0.8329608326452487) * (i * CSK_FOR_M2_COUNTERSUNK_RAISED_HEAD_S_3_A_PITCH) for i in range(1, CSK_FOR_M2_COUNTERSUNK_RAISED_HEAD_S_3_A_COUNT)]):
        add(csk_for_m2_countersunk_raised_head_s_3, mode=Mode.SUBTRACT)

    # CSK for M2 Countersunk Raised Head S 4: CSK for M2 Countersunk Raised Head S 3 ×2
    with Locations(*[Vector(0, 0.06271911253691091, 0.9980312184108182) * (i * CSK_FOR_M2_COUNTERSUNK_RAISED_HEAD_S_4_PITCH) for i in range(1, CSK_FOR_M2_COUNTERSUNK_RAISED_HEAD_S_4_COUNT)]):
        add(csk_for_m2_countersunk_raised_head_s_3, mode=Mode.SUBTRACT)

    # CSK for M2 Countersunk Raised Head S 5: CSK for M2 Countersunk Raised Head S 3 ×2
    with Locations(*[Vector(0, -0.44469926444562935, 0.8956799451821595) * (i * CSK_FOR_M2_COUNTERSUNK_RAISED_HEAD_S_5_PITCH) for i in range(1, CSK_FOR_M2_COUNTERSUNK_RAISED_HEAD_S_5_COUNT)]):
        add(csk_for_m2_countersunk_raised_head_s_3, mode=Mode.SUBTRACT)

    # CSK for M2 Countersunk Raised Head S 6: CSK for M2 Countersunk Raised Head S 3 ×2
    with Locations(*[Vector(0, -0.8329608326452488, 0.553331953965189) * (i * CSK_FOR_M2_COUNTERSUNK_RAISED_HEAD_S_6_PITCH) for i in range(1, CSK_FOR_M2_COUNTERSUNK_RAISED_HEAD_S_6_COUNT)]):
        add(csk_for_m2_countersunk_raised_head_s_3, mode=Mode.SUBTRACT)

    # CSK for M2 Countersunk Raised Head S 7: CSK for M2 Countersunk Raised Head S 3 ×2
    with Locations(*[Vector(0, -0.9980312184108182, 0.06271911253691133) * (i * CSK_FOR_M2_COUNTERSUNK_RAISED_HEAD_S_7_PITCH) for i in range(1, CSK_FOR_M2_COUNTERSUNK_RAISED_HEAD_S_7_COUNT)]):
        add(csk_for_m2_countersunk_raised_head_s_3, mode=Mode.SUBTRACT)

    # Fillet1
    # the kernel refuses this fillet: 2 mm, written as the material it takes off along each edge
    with BuildSketch(Plane(origin=(29.928177417, 14.070634763, 7.5), x_dir=(1, 0, 0), z_dir=(0, 0, -1))) as fillet1_piece_1:
        with BuildLine():
            CenterArc((FILLET1_R, FILLET1_R), FILLET1_R, 180, 90)
            Line((0, FILLET1_R), (0, 0))
            Line((0, 0), (FILLET1_R, 0))
        make_face()
    extrude(amount=38.4, mode=Mode.SUBTRACT)
    with BuildSketch(Plane(origin=(29.91977661, -14.099999768, 7.5), x_dir=(1, 0, 0), z_dir=(0, 0, -1))) as fillet1_piece_2:
        with BuildLine():
            CenterArc((FILLET1_R, -FILLET1_R), FILLET1_R, 90, 90)
            Line((0, -FILLET1_R), (0, 0))
            Line((0, 0), (FILLET1_R, 0))
        make_face()
    extrude(amount=38.4, mode=Mode.SUBTRACT)
    with BuildSketch(Plane(origin=(24.928177417, 14.070634763, 2.5), x_dir=(0, -1, 0), z_dir=(1, 0, 0)), Plane(origin=(24.928177417, 14.070634763, -25.9), x_dir=(0, 0, 1), z_dir=(1, 0, 0))) as fillet1_piece_3:
        with BuildLine():
            CenterArc((FILLET1_R, FILLET1_R), FILLET1_R, 180, 90)
            Line((0, FILLET1_R), (0, 0))
            Line((0, 0), (FILLET1_R, 0))
        make_face()
    extrude(amount=18.999999731, mode=Mode.SUBTRACT)
    with BuildSketch(Plane(origin=(43.928177148, -14.099999768, -25.9), x_dir=(0, 0, 1), z_dir=(-1, 0, 0)), Plane(origin=(43.928177148, -14.099999768, 2.5), x_dir=(0, 1, 0), z_dir=(-1, 0, 0))) as fillet1_piece_4:
        with BuildLine():
            CenterArc((FILLET1_R, FILLET1_R), FILLET1_R, 180, 90)
            Line((0, FILLET1_R), (0, 0))
            Line((0, 0), (FILLET1_R, 0))
        make_face()
    extrude(amount=19.008400538, mode=Mode.SUBTRACT)

    # Fillet2
    fillet2_edges = [part.edges().sort_by_distance(p)[0] for p in [
        (47.9, 8.450808128, -19.219614654),
    ]]
    fillet(fillet2_edges, radius=FILLET2_R)


solid = part.part
